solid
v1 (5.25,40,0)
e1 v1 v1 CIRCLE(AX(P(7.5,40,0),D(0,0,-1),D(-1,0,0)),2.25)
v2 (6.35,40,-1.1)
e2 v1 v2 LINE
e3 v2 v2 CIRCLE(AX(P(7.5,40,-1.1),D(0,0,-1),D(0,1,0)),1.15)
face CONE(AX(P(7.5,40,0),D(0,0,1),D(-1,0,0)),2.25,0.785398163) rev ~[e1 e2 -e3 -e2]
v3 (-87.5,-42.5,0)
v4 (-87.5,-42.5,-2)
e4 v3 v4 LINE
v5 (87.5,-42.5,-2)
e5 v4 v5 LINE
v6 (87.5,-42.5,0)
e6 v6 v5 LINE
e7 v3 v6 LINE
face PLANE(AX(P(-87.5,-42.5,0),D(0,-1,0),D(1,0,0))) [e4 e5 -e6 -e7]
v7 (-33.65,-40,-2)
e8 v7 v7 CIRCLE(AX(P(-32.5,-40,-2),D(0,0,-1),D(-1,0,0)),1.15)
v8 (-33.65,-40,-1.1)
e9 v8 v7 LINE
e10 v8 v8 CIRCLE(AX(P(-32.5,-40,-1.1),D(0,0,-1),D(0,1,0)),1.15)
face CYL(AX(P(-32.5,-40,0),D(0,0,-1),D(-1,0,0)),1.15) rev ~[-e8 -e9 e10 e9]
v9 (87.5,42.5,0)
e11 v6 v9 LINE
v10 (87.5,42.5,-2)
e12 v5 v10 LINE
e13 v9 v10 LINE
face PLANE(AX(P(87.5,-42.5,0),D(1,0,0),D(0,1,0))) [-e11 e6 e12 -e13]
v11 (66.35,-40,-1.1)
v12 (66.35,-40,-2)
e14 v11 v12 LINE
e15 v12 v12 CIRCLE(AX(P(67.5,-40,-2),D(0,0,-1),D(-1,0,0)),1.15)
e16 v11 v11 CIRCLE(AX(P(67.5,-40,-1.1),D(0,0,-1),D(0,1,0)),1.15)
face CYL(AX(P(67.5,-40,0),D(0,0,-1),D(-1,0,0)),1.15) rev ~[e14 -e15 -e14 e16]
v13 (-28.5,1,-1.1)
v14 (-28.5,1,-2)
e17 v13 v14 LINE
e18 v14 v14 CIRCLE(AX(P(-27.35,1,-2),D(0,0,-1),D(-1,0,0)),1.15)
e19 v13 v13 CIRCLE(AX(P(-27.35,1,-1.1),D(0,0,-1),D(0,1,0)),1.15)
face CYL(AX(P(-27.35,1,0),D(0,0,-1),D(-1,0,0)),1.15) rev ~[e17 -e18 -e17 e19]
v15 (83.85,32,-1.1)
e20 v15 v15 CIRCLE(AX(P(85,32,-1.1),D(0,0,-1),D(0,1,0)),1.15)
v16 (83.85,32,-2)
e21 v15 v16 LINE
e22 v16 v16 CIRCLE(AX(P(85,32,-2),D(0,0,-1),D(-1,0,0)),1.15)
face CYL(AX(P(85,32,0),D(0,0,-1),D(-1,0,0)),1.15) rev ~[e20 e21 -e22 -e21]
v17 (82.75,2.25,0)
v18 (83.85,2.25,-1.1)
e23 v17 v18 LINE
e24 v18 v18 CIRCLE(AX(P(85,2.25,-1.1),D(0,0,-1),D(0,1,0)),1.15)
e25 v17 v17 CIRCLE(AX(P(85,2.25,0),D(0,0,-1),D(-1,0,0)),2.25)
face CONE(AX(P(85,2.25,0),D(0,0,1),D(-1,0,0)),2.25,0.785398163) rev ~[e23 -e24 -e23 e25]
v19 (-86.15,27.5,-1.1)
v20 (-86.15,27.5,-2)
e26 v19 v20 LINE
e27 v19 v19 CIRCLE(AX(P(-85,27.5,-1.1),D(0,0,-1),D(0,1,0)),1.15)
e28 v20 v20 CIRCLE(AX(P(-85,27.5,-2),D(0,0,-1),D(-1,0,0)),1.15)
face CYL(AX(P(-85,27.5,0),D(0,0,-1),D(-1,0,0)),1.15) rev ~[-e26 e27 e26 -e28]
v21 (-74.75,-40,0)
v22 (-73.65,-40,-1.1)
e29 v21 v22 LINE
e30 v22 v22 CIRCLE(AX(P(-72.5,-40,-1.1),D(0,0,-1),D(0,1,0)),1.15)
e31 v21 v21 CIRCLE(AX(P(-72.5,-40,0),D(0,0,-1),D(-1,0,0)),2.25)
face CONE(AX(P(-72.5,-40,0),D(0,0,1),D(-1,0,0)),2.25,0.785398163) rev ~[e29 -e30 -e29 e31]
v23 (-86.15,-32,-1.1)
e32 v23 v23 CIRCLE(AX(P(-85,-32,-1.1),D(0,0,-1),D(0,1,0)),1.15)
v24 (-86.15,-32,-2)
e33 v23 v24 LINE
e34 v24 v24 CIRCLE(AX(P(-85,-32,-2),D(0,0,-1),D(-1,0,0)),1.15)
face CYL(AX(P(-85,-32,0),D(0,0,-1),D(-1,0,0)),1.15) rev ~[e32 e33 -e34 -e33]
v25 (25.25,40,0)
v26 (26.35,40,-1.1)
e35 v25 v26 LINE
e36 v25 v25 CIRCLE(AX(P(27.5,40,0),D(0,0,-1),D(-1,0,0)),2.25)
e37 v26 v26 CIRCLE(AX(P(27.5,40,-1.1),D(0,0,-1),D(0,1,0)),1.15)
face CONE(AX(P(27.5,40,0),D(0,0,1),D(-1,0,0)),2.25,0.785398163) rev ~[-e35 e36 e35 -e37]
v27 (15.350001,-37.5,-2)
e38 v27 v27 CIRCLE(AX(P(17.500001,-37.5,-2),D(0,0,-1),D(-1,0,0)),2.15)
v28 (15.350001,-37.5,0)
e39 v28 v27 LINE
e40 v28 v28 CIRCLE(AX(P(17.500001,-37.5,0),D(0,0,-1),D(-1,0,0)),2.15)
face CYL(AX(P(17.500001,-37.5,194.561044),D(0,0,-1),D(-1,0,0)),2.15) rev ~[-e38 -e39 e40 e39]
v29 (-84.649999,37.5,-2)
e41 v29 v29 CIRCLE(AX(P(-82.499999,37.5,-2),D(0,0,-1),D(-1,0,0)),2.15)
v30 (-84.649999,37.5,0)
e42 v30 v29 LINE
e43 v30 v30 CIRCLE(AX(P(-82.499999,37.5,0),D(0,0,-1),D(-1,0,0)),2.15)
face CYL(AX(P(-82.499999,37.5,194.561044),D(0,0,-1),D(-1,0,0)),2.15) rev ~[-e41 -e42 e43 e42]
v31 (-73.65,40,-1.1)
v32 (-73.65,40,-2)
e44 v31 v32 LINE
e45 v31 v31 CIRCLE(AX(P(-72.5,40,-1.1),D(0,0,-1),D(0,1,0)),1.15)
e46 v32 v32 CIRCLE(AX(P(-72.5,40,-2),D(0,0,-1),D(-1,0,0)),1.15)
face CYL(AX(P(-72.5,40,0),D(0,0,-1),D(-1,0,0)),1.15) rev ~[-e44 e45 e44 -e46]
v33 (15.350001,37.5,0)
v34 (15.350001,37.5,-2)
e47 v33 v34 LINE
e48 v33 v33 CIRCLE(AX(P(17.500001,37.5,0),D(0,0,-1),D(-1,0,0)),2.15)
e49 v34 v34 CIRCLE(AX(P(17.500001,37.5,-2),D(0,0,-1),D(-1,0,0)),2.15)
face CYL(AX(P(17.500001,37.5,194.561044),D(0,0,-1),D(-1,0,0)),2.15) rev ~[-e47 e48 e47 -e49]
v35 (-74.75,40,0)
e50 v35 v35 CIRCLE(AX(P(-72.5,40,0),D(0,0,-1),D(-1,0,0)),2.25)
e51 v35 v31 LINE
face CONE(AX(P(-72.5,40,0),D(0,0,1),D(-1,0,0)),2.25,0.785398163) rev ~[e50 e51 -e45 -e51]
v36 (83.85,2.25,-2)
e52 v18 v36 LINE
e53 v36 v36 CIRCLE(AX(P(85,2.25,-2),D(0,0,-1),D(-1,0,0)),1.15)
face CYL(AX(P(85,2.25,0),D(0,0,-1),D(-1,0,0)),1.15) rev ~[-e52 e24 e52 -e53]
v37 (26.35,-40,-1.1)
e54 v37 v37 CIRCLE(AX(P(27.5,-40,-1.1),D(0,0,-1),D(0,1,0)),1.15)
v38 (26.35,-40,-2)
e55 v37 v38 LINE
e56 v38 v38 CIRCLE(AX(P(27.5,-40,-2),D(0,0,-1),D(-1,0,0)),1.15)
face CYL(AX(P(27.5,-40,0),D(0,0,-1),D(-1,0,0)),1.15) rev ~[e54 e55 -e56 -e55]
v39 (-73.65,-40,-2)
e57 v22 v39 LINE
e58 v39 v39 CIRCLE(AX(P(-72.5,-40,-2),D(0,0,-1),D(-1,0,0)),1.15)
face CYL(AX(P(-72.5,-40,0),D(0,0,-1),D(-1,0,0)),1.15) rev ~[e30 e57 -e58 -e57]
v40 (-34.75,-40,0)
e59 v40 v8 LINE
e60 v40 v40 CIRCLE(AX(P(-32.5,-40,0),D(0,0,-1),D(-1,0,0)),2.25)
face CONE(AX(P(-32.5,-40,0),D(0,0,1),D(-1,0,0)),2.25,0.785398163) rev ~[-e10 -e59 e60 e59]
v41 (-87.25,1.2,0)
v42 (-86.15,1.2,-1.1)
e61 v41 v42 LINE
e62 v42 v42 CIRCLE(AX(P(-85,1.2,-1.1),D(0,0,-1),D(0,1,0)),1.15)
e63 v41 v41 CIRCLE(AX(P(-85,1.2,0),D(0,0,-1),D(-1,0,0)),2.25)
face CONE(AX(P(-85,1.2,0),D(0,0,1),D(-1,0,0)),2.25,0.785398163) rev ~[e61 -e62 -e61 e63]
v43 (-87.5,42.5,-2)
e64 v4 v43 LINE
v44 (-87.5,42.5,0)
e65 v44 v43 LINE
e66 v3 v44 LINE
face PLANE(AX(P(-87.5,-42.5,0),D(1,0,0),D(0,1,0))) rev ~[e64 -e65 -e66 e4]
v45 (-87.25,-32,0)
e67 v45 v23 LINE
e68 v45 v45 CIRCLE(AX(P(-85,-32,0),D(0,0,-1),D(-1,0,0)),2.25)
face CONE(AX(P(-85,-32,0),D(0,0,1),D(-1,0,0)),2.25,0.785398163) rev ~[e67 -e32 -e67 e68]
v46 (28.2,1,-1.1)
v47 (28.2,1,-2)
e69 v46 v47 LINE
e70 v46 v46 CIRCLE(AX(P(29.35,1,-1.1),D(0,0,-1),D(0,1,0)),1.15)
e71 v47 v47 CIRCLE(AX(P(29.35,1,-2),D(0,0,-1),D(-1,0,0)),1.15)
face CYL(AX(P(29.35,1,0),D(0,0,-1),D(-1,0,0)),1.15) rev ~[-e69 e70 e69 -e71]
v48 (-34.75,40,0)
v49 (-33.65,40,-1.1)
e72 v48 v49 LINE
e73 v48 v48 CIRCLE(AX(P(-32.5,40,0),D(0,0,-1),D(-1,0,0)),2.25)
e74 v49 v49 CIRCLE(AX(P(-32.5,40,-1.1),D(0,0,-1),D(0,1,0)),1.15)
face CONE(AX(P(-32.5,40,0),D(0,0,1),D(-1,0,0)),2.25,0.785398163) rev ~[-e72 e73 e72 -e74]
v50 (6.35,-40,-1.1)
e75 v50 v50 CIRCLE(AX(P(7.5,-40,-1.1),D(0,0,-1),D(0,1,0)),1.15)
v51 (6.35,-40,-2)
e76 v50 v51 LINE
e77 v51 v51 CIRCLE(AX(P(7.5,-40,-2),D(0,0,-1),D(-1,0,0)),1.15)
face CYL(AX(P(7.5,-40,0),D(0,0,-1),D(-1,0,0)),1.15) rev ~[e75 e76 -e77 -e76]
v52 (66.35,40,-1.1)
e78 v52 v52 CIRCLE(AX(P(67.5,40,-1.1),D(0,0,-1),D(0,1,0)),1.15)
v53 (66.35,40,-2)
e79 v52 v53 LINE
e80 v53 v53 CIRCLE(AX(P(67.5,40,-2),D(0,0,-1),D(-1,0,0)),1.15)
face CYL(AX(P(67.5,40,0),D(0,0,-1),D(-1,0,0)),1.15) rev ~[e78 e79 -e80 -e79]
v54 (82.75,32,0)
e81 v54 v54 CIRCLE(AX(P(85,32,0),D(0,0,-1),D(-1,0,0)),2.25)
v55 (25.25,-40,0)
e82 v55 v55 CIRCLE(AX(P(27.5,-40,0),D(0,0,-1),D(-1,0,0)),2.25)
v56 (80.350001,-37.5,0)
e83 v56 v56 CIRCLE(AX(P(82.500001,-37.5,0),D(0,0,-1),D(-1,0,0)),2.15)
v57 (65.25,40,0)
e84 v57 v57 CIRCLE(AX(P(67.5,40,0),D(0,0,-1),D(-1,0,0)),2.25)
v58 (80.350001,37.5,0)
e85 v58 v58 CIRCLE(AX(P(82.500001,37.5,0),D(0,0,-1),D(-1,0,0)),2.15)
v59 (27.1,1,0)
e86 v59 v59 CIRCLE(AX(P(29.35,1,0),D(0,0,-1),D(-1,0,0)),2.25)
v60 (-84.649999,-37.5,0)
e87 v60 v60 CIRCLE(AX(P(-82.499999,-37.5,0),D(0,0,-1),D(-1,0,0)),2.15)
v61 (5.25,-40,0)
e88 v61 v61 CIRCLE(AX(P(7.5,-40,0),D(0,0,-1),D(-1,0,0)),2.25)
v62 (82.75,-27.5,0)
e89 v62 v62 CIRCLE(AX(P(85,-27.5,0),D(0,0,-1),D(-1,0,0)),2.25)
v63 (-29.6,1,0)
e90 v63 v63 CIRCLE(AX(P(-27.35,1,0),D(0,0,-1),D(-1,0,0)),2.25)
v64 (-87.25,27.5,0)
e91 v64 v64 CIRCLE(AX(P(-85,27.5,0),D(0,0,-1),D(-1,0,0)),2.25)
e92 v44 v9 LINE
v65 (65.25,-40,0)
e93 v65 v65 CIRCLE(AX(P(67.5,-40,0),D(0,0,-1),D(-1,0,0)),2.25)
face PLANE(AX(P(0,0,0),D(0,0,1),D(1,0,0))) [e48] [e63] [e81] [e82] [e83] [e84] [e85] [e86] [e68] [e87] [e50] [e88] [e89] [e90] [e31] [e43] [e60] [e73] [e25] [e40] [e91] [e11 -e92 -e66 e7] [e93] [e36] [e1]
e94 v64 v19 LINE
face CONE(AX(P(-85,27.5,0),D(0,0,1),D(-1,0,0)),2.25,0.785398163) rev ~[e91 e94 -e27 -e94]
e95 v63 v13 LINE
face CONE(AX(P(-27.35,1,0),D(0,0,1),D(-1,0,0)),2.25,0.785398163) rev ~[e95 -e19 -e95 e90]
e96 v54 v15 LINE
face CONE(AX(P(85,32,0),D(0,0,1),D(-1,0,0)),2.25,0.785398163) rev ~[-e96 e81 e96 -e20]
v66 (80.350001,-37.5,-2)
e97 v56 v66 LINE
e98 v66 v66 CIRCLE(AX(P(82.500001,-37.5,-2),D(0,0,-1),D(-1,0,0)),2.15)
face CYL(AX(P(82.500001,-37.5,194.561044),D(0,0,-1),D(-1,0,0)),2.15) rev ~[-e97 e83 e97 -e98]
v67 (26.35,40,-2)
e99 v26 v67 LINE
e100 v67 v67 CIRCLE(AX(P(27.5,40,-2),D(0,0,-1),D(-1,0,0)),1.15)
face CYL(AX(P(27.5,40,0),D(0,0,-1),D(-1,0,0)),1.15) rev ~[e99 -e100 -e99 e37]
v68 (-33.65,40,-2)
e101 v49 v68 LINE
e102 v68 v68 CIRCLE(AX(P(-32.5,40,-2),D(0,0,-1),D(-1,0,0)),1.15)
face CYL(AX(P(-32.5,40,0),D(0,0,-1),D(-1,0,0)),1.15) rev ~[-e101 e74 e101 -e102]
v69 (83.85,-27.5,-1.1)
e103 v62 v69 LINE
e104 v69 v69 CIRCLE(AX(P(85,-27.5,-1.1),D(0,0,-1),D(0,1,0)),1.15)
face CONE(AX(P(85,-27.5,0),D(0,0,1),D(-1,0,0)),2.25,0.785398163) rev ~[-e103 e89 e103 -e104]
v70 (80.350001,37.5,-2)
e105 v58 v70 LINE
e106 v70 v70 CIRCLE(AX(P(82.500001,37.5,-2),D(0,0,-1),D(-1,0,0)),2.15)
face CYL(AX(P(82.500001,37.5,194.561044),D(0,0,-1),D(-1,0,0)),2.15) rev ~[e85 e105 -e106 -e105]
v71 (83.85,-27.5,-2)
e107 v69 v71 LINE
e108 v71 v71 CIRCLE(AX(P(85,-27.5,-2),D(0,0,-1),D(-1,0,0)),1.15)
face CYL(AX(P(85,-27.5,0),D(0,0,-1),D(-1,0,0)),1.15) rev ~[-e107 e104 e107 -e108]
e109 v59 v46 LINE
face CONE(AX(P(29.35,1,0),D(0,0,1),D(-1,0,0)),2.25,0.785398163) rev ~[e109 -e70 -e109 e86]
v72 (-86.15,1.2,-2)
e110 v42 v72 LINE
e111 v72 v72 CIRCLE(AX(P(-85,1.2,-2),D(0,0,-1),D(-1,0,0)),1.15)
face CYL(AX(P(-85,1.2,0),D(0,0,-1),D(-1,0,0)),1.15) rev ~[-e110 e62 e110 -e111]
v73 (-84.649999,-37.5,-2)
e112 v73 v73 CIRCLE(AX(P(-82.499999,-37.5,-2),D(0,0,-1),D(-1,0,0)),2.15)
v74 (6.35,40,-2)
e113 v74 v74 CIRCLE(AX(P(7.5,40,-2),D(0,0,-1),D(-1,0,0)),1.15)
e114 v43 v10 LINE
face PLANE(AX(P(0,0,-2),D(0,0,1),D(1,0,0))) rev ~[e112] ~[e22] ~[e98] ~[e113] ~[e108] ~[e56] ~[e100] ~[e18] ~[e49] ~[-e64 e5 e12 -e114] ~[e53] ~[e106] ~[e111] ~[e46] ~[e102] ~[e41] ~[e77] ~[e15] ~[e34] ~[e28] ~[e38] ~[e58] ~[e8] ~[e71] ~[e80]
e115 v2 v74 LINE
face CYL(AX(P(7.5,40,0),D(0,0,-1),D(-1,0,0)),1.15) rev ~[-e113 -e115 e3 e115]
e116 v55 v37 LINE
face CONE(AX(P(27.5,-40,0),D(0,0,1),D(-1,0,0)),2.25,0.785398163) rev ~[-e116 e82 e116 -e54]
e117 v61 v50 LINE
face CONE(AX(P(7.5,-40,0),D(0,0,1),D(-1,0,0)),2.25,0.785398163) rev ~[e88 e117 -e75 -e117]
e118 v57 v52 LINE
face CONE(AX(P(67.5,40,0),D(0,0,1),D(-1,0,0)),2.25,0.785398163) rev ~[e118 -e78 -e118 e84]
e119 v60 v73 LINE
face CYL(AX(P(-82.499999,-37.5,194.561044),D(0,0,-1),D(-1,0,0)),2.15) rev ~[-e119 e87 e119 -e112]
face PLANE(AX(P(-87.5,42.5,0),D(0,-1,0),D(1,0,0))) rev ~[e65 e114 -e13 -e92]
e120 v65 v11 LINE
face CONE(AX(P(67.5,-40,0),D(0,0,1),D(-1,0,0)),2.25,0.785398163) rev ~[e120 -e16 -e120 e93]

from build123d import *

# Parameters (mm, degrees)
F0_W                 = 175
F0_H                 = 85
F0_R                 = 2.25
F0_R_2               = 1.15
F1_DEPTH             = 2
F2_D                 = 4.3
F4_D                 = 2.3
F4_CSINK_D           = 4.5
F4_CSINK_ANGLE       = 90
F4_ON_F3_D           = 2.3
F4_ON_F3_CSINK_D     = 4.5
F4_ON_F3_CSINK_ANGLE = 90


# Not quite as in the source:
# - ends of sketch curves that miss each other by under 0.0002 mm in the source are joined


with BuildPart() as f1:
    # F0 (on Top) → F1 (new body)
    with BuildSketch(Plane.XY):
        Rectangle(F0_W, F0_H)
        with BuildLine():
            ThreePointArc((-80.499999, -37.5), (-82.499999, -39.5), (-84.499999, -37.5))
            ThreePointArc((-84.499999, -37.5), (-82.4999995, -35.499999), (-80.499999, -37.5))
        make_face(mode=Mode.SUBTRACT)
        with Locations((-72.5, -40)):
            Circle(F0_R, mode=Mode.SUBTRACT)
        with Locations((-85, -32)):
            Circle(F0_R, mode=Mode.SUBTRACT)
        with Locations((-32.5, -40)):
            Circle(F0_R, mode=Mode.SUBTRACT)
        with Locations((7.5, -40)):
            Circle(F0_R, mode=Mode.SUBTRACT)
        with BuildLine():
            ThreePointArc((19.500001, -37.5), (17.500001, -39.5), (15.500001, -37.5))
            ThreePointArc((15.500001, -37.5), (17.5000005, -35.499999), (19.500001, -37.5))
        make_face(mode=Mode.SUBTRACT)
        with Locations((27.5, -40)):
            Circle(F0_R, mode=Mode.SUBTRACT)
        with Locations((67.5, -40)):
            Circle(F0_R, mode=Mode.SUBTRACT)
        with BuildLine():
            ThreePointArc((84.500001, -37.5), (82.500001, -39.5), (80.500001, -37.5))
            ThreePointArc((80.500001, -37.5), (82.5000005, -35.499999), (84.500001, -37.5))
        make_face(mode=Mode.SUBTRACT)
        with Locations((85, -27.5)):
            Circle(F0_R, mode=Mode.SUBTRACT)
        with Locations((-85, 0)):
            Circle(F0_R, mode=Mode.SUBTRACT)
        with Locations((-85, 27.5)):
            Circle(F0_R, mode=Mode.SUBTRACT)
        with BuildLine():
            ThreePointArc((-80.499999, 37.5), (-82.499999, 35.5), (-84.499999, 37.5))
            ThreePointArc((-84.499999, 37.5), (-82.4999995, 39.500001), (-80.499999, 37.5))
        make_face(mode=Mode.SUBTRACT)
        with Locations((-72.5, 40)):
            Circle(F0_R, mode=Mode.SUBTRACT)
        with Locations((-32.5, 40)):
            Circle(F0_R, mode=Mode.SUBTRACT)
        with Locations((85, 0)):
            Circle(F0_R, mode=Mode.SUBTRACT)
        with Locations((7.5, 40)):
            Circle(F0_R, mode=Mode.SUBTRACT)
        with BuildLine():
            ThreePointArc((19.500001, 37.5), (17.500001, 35.5), (15.500001, 37.5))
            ThreePointArc((15.500001, 37.5), (17.5000005, 39.500001), (19.500001, 37.5))
        make_face(mode=Mode.SUBTRACT)
        with Locations((27.5, 40)):
            Circle(F0_R, mode=Mode.SUBTRACT)
        with Locations((85, 24.3)):
            Circle(F0_R, mode=Mode.SUBTRACT)
        with Locations((67.5, 40)):
            Circle(F0_R, mode=Mode.SUBTRACT)
        with BuildLine():
            ThreePointArc((84.500001, 37.5), (82.500001, 35.5), (80.500001, 37.5))
            ThreePointArc((80.500001, 37.5), (82.5000005, 39.500001), (84.500001, 37.5))
        make_face(mode=Mode.SUBTRACT)
        with Locations((-85, 27.5)):
            Circle(F0_R)
        with Locations((-85, 27.5)):
            Circle(F0_R_2, mode=Mode.SUBTRACT)
        with Locations((7.5, 40)):
            Circle(F0_R)
        with Locations((7.5, 40)):
            Circle(F0_R_2, mode=Mode.SUBTRACT)
        with Locations((-32.5, -40)):
            Circle(F0_R)
        with Locations((-32.5, -40)):
            Circle(F0_R_2, mode=Mode.SUBTRACT)
        with Locations((7.5, -40)):
            Circle(F0_R)
        with Locations((7.5, -40)):
            Circle(F0_R_2, mode=Mode.SUBTRACT)
        with Locations((-85, 0)):
            Circle(F0_R)
        with Locations((-85, 0)):
            Circle(F0_R_2, mode=Mode.SUBTRACT)
        with Locations((-32.5, 40)):
            Circle(F0_R)
        with Locations((-32.5, 40)):
            Circle(F0_R_2, mode=Mode.SUBTRACT)
        with Locations((85, 0)):
            Circle(F0_R)
        with Locations((85, 0)):
            Circle(F0_R_2, mode=Mode.SUBTRACT)
        with Locations((-72.5, 40)):
            Circle(F0_R)
        with Locations((-72.5, 40)):
            Circle(F0_R_2, mode=Mode.SUBTRACT)
        with Locations((-85, -32)):
            Circle(F0_R)
        with Locations((-85, -32)):
            Circle(F0_R_2, mode=Mode.SUBTRACT)
        with Locations((-72.5, -40)):
            Circle(F0_R)
        with Locations((-72.5, -40)):
            Circle(F0_R_2, mode=Mode.SUBTRACT)
        with Locations((27.5, 40)):
            Circle(F0_R)
        with Locations((27.5, 40)):
            Circle(F0_R_2, mode=Mode.SUBTRACT)
        with Locations((27.5, -40)):
            Circle(F0_R)
        with Locations((27.5, -40)):
            Circle(F0_R_2, mode=Mode.SUBTRACT)
        with Locations((67.5, 40)):
            Circle(F0_R)
        with Locations((67.5, 40)):
            Circle(F0_R_2, mode=Mode.SUBTRACT)
        with Locations((85, 24.3)):
            Circle(F0_R)
        with Locations((85, 24.3)):
            Circle(F0_R_2, mode=Mode.SUBTRACT)
        with Locations((67.5, -40)):
            Circle(F0_R)
        with Locations((67.5, -40)):
            Circle(F0_R_2, mode=Mode.SUBTRACT)
        with Locations((85, -27.5)):
            Circle(F0_R)
        with Locations((85, -27.5)):
            Circle(F0_R_2, mode=Mode.SUBTRACT)
        with BuildLine():
            ThreePointArc((-80.499999, -37.499999), (-82.4999995, -35.499999), (-84.499999, -37.5))
            ThreePointArc((-84.499999, -37.5), (-82.499999, -39.5), (-80.499999, -37.499999))
        make_face()
        with BuildLine():
            ThreePointArc((19.500001, -37.499999), (17.5000005, -35.499999), (15.500001, -37.5))
            ThreePointArc((15.500001, -37.5), (17.500001, -39.5), (19.500001, -37.499999))
        make_face()
        with BuildLine():
            ThreePointArc((84.500001, 37.500001), (82.5000005, 39.500001), (80.500001, 37.5))
            ThreePointArc((80.500001, 37.5), (82.500001, 35.5), (84.500001, 37.500001))
        make_face()
        with BuildLine():
            ThreePointArc((19.500001, 37.500001), (17.5000005, 39.500001), (15.500001, 37.5))
            ThreePointArc((15.500001, 37.5), (17.500001, 35.5), (19.500001, 37.500001))
        make_face()
        with BuildLine():
            ThreePointArc((-80.499999, 37.500001), (-82.4999995, 39.500001), (-84.499999, 37.5))
            ThreePointArc((-84.499999, 37.5), (-82.499999, 35.5), (-80.499999, 37.500001))
        make_face()
        with BuildLine():
            ThreePointArc((84.500001, -37.499999), (82.5000005, -35.499999), (80.500001, -37.5))
            ThreePointArc((80.500001, -37.5), (82.500001, -39.5), (84.500001, -37.499999))
        make_face()
        with Locations((-85, 27.5)):
            Circle(F0_R_2)
        with Locations((85, 24.3)):
            Circle(F0_R_2)
        with Locations((-85, -32)):
            Circle(F0_R_2)
        with Locations((-72.5, -40)):
            Circle(F0_R_2)
        with Locations((-32.5, -40)):
            Circle(F0_R_2)
        with Locations((7.5, -40)):
            Circle(F0_R_2)
        with Locations((-72.5, 40)):
            Circle(F0_R_2)
        with Locations((7.5, 40)):
            Circle(F0_R_2)
        with Locations((-32.5, 40)):
            Circle(F0_R_2)
        with Locations((85, 0)):
            Circle(F0_R_2)
        with Locations((27.5, -40)):
            Circle(F0_R_2)
        with Locations((-85, 0)):
            Circle(F0_R_2)
        with Locations((67.5, 40)):
            Circle(F0_R_2)
        with Locations((27.5, 40)):
            Circle(F0_R_2)
        with Locations((67.5, -40)):
            Circle(F0_R_2)
        with Locations((85, -27.5)):
            Circle(F0_R_2)
    extrude(amount=-F1_DEPTH)

    # F2 (through all)
    with Locations(Plane.XY):
        with Locations((-82.499999, 37.5), (17.500001, 37.5), (82.500001, 37.5), (82.500001, -37.5), (-82.499999, -37.5), (17.500001, -37.5)):
            Hole(F2_D / 2)

    # F4 (through all)
    with Locations(Plane.XY):
        with Locations((-85, -32), (-72.5, -40), (-85, 27.5), (-72.5, 40), (-32.5, -40), (7.5, -40), (27.5, -40), (67.5, -40), (-32.5, 40), (7.5, 40), (27.5, 40), (67.5, 40), (85, -27.5)):
            CounterSinkHole(F4_D / 2, F4_CSINK_D / 2, counter_sink_angle=F4_CSINK_ANGLE)

    # F4 on F3 (through all)
    with Locations(Plane.XY):
        with Locations((85, 32), (85, 2.25), (-85, 1.2), (-27.35, 1), (29.35, 1)):
            CounterSinkHole(F4_ON_F3_D / 2, F4_ON_F3_CSINK_D / 2, counter_sink_angle=F4_ON_F3_CSINK_ANGLE)


solid = f1.part
